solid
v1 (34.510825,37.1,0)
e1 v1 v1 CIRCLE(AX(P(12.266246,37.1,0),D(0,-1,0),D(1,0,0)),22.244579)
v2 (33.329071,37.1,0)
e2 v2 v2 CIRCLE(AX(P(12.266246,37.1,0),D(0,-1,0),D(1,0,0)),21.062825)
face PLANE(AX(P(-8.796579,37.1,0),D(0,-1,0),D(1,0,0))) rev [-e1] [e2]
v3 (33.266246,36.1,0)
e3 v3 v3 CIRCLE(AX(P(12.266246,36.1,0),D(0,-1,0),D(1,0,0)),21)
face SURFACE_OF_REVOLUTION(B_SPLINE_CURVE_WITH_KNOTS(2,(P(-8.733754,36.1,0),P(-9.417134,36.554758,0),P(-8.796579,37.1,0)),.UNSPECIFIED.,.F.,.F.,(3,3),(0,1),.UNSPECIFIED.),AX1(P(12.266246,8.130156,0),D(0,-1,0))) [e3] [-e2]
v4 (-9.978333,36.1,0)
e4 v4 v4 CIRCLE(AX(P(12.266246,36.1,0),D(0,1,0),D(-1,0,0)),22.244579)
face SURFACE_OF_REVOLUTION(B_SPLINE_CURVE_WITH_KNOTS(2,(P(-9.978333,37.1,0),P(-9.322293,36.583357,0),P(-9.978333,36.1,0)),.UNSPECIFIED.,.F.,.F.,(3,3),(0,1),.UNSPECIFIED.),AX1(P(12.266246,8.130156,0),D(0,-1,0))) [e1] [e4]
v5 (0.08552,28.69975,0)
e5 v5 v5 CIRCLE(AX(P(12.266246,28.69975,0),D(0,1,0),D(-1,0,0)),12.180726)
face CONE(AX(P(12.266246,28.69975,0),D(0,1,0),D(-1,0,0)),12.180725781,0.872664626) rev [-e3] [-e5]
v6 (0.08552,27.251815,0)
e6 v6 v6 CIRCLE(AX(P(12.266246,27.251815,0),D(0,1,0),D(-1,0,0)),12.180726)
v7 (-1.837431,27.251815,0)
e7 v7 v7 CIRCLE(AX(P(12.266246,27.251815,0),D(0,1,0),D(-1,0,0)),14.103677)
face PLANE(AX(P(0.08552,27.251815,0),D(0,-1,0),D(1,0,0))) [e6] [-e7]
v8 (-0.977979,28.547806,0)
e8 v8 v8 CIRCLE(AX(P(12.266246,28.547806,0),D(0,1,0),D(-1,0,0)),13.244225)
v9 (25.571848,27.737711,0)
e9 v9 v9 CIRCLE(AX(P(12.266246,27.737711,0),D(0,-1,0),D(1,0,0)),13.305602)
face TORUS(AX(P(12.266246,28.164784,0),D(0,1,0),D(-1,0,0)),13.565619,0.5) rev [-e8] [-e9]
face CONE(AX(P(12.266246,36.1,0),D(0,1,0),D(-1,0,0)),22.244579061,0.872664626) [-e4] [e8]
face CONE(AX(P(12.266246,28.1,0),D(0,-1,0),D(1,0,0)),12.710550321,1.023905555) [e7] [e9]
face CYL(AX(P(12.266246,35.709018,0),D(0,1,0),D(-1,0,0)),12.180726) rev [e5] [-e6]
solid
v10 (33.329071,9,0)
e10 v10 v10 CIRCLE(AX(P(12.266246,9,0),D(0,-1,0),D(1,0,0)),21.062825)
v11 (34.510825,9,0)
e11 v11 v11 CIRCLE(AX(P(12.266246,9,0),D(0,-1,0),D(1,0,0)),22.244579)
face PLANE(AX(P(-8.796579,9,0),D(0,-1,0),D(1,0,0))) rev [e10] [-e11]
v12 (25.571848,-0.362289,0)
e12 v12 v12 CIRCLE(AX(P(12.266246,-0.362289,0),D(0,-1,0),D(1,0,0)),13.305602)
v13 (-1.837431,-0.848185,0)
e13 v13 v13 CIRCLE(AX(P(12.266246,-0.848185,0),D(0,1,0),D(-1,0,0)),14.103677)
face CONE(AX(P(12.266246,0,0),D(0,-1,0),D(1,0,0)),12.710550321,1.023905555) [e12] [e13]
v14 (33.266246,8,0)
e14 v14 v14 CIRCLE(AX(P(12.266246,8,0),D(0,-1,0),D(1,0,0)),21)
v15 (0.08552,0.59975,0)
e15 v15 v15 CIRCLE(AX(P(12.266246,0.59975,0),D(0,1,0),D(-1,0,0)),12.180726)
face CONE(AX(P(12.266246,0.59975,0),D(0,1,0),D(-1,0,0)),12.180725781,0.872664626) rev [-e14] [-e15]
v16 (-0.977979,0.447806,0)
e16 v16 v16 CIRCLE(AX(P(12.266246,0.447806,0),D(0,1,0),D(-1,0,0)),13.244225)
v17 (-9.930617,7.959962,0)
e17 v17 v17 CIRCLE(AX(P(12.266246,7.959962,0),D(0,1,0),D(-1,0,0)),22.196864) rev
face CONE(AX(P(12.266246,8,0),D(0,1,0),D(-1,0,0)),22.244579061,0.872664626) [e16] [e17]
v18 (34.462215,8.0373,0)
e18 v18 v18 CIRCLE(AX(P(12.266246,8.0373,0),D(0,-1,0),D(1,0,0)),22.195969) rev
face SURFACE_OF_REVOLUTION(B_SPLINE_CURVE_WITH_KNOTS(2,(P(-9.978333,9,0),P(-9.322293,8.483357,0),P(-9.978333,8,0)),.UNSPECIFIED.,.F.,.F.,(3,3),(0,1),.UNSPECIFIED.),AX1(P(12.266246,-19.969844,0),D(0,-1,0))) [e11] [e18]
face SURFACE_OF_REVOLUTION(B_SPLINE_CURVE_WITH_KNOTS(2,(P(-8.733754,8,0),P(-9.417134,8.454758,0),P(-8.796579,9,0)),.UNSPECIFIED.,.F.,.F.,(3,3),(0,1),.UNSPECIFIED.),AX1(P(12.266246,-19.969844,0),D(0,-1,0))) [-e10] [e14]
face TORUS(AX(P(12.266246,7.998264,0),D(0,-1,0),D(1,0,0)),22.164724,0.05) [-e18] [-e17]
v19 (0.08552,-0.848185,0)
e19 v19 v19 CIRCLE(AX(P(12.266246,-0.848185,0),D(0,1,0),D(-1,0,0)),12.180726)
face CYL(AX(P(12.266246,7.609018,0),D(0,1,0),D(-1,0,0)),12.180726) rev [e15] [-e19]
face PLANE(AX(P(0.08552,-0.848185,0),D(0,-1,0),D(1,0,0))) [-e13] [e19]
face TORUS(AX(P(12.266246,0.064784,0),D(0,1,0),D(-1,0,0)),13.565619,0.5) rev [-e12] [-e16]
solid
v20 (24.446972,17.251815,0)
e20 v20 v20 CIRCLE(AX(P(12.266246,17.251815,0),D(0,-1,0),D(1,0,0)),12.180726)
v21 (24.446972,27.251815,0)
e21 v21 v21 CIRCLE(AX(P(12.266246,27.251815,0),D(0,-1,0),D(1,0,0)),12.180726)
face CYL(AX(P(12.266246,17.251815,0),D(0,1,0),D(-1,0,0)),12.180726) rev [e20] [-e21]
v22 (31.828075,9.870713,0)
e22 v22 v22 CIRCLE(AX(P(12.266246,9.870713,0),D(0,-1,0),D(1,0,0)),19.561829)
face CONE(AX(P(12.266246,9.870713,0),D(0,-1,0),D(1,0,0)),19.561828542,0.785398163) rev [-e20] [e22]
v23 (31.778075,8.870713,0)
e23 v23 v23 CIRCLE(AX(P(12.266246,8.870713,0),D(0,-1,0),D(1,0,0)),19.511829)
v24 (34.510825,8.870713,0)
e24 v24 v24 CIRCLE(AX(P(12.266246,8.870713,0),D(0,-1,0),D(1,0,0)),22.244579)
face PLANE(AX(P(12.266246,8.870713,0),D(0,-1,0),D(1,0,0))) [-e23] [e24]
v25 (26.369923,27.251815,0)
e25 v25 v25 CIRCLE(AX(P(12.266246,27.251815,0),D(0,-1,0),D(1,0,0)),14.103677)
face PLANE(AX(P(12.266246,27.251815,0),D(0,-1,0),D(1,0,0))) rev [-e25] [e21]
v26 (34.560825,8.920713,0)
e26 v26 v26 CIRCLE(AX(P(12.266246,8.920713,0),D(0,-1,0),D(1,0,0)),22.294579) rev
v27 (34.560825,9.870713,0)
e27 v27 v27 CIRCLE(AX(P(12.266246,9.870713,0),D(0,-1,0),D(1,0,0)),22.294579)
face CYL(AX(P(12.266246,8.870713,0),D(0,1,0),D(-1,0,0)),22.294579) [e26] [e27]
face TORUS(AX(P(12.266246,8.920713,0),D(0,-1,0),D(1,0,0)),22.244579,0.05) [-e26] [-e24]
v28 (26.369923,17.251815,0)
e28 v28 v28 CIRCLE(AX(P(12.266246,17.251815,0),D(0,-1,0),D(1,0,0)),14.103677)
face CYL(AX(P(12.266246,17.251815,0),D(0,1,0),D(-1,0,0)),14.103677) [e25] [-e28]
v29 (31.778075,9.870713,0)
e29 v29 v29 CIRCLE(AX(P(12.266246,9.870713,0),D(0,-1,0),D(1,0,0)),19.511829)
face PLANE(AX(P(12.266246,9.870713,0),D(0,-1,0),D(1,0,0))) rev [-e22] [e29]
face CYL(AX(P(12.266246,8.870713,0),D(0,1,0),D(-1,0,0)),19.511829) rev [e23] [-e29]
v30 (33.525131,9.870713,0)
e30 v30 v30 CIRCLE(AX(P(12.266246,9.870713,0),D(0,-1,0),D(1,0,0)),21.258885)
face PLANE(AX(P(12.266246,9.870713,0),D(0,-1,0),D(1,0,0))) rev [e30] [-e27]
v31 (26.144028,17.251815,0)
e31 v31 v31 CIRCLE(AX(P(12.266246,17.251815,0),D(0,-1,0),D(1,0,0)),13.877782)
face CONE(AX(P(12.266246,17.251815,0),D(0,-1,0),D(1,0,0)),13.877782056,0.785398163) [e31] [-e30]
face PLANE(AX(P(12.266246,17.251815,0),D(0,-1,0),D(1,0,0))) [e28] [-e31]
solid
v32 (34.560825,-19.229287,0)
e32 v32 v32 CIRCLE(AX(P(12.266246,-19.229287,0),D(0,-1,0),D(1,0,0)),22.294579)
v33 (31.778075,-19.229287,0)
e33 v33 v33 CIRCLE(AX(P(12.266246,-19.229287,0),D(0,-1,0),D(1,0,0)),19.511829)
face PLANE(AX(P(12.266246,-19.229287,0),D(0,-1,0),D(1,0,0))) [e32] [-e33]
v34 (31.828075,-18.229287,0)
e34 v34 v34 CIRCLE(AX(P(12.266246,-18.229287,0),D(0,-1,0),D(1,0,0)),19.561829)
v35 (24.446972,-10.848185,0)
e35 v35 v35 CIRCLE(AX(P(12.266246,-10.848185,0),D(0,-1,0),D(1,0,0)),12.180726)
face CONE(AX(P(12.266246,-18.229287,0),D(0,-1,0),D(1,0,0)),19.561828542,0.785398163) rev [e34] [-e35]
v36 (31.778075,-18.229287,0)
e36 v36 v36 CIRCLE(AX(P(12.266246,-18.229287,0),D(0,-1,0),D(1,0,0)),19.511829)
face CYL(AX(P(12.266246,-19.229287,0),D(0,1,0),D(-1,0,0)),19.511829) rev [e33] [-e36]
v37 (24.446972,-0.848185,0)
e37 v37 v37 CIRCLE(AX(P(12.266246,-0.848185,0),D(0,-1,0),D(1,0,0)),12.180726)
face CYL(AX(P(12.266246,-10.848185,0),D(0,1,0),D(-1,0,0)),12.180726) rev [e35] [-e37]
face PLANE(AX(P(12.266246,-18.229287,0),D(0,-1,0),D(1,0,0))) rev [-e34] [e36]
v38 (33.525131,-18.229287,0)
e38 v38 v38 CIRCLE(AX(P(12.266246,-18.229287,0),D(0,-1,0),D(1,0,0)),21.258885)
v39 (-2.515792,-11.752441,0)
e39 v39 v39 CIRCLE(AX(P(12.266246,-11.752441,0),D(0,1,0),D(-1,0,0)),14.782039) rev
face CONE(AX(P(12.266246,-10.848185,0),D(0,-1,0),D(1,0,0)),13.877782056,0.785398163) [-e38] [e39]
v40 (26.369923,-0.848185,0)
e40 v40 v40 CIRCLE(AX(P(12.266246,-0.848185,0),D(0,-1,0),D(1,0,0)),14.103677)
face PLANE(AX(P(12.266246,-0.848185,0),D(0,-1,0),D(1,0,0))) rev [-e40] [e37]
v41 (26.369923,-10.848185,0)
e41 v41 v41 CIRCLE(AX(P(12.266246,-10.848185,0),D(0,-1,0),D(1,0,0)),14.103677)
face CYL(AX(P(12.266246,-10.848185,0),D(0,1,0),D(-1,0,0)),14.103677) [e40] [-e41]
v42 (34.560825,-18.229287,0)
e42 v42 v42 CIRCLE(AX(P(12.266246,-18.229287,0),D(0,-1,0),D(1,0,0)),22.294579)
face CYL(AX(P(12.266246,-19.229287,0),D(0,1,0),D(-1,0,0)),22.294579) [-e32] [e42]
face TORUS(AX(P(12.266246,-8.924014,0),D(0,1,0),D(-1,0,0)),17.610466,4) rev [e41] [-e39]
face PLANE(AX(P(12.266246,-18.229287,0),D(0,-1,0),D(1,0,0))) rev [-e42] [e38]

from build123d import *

# Parameters (mm, degrees)
ACTIVE_FILLET_R     = 0.5
SKETCH11_R          = 14.103676921920666
SKETCH11_R_2        = 12.180725781348816
COLLAR_DEPTH        = 10
SKETCH18_R          = 22.29457906148835
SKETCH18_R_2        = 19.511828541936428
BOSS_EXTRUDE4_DEPTH = 1
FILLET3_R           = 0.05
FILLET4_R           = 0.05
FILLET5_R           = 4


# Read off the part's stored shape, not the designer's step: Body-Move/Copy2
with BuildPart() as part:
    # Sketch1 → Main Active (revolve)
    with BuildSketch(Plane.XY):
        Polygon((-0.44430417046757187, 0), (-9.97833291122136, 8), (-8.733753849733018, 8), (0.08552036891816808, 0.5997502558785777), (0.08552036891816808, -0.8481847341285212), (-1.8374307716536824, -0.8481847341285211), align=None)
    revolve(axis=Axis((12.266246150266982, 7.609018032819944, 0), (1.1e-16, -1, 0)))

    # Active fillet
    active_fillet_edges = [part.edges().sort_by_distance(p)[0] for p in [
        (24.976796471001535, 3.23e-15, -1.56e-15),
    ]]
    fillet(active_fillet_edges, radius=ACTIVE_FILLET_R)

    # Sketch17 → Neck Curve (revolve)
    with BuildSketch(Plane.XY, mode=Mode.PRIVATE) as neck_curve_sk:
        with BuildLine():
            Line((-9.978332911221361, 8), (-8.733753849733016, 8))
            add(Edge.make_bspline(
                [(-8.733753849733016, 8), (-9.417134243608169, 8.454758024892763), (-8.796578828718458, 9.000000000000004)],
                knots=[0, 0, 0, 1, 1, 1], degree=2))
            Line((-8.796578828718458, 9.000000000000004), (-9.978332911221361, 9.000000000000004))
            add(Edge.make_bspline(
                [(-9.978332911221361, 8), (-9.322292514147533, 8.483356916822304), (-9.978332911221361, 9.000000000000004)],
                knots=[0, 0, 0, 1, 1, 1], degree=2))
        make_face()
    revolve(neck_curve_sk.sketch.rotate(Axis((12.266246150266984, -19.969844330252183, 0), (-1.2e-16, 1, 0)), 180), axis=Axis((12.266246150266984, -19.969844330252183, 0), (-1.2e-16, 1, 0)))

    # Fillet3
    fillet3_edges = [part.edges().sort_by_distance(p)[0] for p in [
        (12.266246150266975, 8.000000000000002, -22.24457906148834),
    ]]
    fillet(fillet3_edges, radius=FILLET3_R)


with BuildPart() as body_2:
    # Sketch11 → collar (new body)
    with BuildSketch(Plane.XZ.offset(0.848184734128521)):
        with Locations((12.266246150266984, 0)):
            Circle(SKETCH11_R)
        with Locations((12.266246150266984, 0)):
            Circle(SKETCH11_R_2, mode=Mode.SUBTRACT)
    extrude(amount=COLLAR_DEPTH)

    # Sketch14 → Passive Element (revolve)
    with BuildSketch(Plane.XY, mode=Mode.PRIVATE) as passive_element_sk:
        Polygon((-1.611535905929543, -10.848184734128521), (-8.99263866651715, -18.22928749471616), (-7.295582391669438, -18.22928749471616), (0.08552036891816897, -10.848184734128521), align=None)
    revolve(passive_element_sk.sketch.rotate(Axis((12.266246150266984, -19.969844330252183, 0), (-1.2e-16, 1, 0)), 180), axis=Axis((12.266246150266984, -19.969844330252183, 0), (-1.2e-16, 1, 0)))

    # Sketch18 → Boss-Extrude4 (add)
    with BuildSketch(Plane.XZ.offset(18.22928749471616)):
        with Locations((12.266246150266984, 0)):
            Circle(SKETCH18_R)
        with Locations((12.266246150266984, 0)):
            Circle(SKETCH18_R_2, mode=Mode.SUBTRACT)
    extrude(amount=BOSS_EXTRUDE4_DEPTH)

    # Fillet5
    # the kernel refuses this fillet: 4 mm, written as the material it adds along each edge
    with BuildSketch(Plane(origin=(12.266246150266982, -10.84818473412852, 0), x_dir=(1, 1.3e-16, 1.2e-16), z_dir=(-1.2e-16, 0, 1))) as fillet5_piece_1:
        with BuildLine():
            CenterArc((17.610465682983815, 1.9241706227050854), FILLET5_R, 208.7535216625701, 16.246478337429835)
            Line((14.103676921920679, 5.3e-15), (13.877782056196525, 0))
            Line((13.877782056196525, 0), (14.782038558237621, -0.9042565020411005))
        make_face()
    revolve(axis=Axis((12.266246150266982, -10.84818473412852, 0), (-1.2e-16, 1, 0)))


with BuildPart() as body_3:
    # Body-Move/Copy2 outline → Body-Move/Copy2 (revolve)
    with BuildSketch(Plane(origin=(12.26624615, 0, 0), x_dir=(1, 0, 0), z_dir=(0, 0, 1))):
        with BuildLine():
            Line((14.103676922, 27.251815266), (13.305602068, 27.737711456))
            ThreePointArc((13.305602068, 27.737711456), (13.067048008, 28.127010025), (13.24422527, 28.547806453))
            Line((13.24422527, 28.547806453), (22.244579061, 36.1))
            add(Edge.make_bspline(
                [(22.244579061, 37.1), (21.58853866441453, 36.5833569168223), (22.244579061, 36.1)],
                knots=[0, 0, 0, 1, 1, 1], degree=2))
            Line((22.244579061, 37.1), (21.062824979, 37.1))
            add(Edge.make_bspline(
                [(21.062824979, 37.1), (21.683380393875147, 36.55475802489277), (21, 36.1)],
                knots=[0.04818103665717954, 0.04818103665717954, 0.04818103665717954, 1.0481810366571813, 1.0481810366571813, 1.0481810366571813], degree=2))
            Line((21, 36.1), (12.180725781, 28.699750256))
            Line((12.180725781, 28.699750256), (12.180725781, 27.251815266))
            Line((12.180725781, 27.251815266), (14.103676922, 27.251815266))
        make_face()
    revolve(axis=Axis((12.26624615, 0, 0), (0, 1, 0)))


with BuildPart() as body_4:
    # Body-Move_Copy2 2 outline → Body-Move_Copy2 2 (revolve)
    with BuildSketch(Plane(origin=(12.26624615, 0, 0), x_dir=(1, 0, 0), z_dir=(0, 0, 1))):
        Polygon((13.877782056, 17.251815266), (14.103676922, 17.251815266), (14.103676922, 27.251815266), (12.180725781, 27.251815266), (12.180725781, 17.251815266), (19.561828542, 9.870712505), (19.511828542, 9.870712505), (19.511828542, 8.870712505), (22.294579061, 8.870712505), (22.294579061, 9.870712505), (21.258884817, 9.870712505), align=None)
    revolve(axis=Axis((12.26624615, 0, 0), (0, 1, 0)))

    # Fillet4
    fillet4_edges = [body_4.edges().sort_by_distance(p)[0] for p in [
        (-10.028332911, 8.870712505, -2.73e-15),
    ]]
    fillet(fillet4_edges, radius=FILLET4_R)


solid = Compound([part.part, body_2.part, body_3.part, body_4.part])
